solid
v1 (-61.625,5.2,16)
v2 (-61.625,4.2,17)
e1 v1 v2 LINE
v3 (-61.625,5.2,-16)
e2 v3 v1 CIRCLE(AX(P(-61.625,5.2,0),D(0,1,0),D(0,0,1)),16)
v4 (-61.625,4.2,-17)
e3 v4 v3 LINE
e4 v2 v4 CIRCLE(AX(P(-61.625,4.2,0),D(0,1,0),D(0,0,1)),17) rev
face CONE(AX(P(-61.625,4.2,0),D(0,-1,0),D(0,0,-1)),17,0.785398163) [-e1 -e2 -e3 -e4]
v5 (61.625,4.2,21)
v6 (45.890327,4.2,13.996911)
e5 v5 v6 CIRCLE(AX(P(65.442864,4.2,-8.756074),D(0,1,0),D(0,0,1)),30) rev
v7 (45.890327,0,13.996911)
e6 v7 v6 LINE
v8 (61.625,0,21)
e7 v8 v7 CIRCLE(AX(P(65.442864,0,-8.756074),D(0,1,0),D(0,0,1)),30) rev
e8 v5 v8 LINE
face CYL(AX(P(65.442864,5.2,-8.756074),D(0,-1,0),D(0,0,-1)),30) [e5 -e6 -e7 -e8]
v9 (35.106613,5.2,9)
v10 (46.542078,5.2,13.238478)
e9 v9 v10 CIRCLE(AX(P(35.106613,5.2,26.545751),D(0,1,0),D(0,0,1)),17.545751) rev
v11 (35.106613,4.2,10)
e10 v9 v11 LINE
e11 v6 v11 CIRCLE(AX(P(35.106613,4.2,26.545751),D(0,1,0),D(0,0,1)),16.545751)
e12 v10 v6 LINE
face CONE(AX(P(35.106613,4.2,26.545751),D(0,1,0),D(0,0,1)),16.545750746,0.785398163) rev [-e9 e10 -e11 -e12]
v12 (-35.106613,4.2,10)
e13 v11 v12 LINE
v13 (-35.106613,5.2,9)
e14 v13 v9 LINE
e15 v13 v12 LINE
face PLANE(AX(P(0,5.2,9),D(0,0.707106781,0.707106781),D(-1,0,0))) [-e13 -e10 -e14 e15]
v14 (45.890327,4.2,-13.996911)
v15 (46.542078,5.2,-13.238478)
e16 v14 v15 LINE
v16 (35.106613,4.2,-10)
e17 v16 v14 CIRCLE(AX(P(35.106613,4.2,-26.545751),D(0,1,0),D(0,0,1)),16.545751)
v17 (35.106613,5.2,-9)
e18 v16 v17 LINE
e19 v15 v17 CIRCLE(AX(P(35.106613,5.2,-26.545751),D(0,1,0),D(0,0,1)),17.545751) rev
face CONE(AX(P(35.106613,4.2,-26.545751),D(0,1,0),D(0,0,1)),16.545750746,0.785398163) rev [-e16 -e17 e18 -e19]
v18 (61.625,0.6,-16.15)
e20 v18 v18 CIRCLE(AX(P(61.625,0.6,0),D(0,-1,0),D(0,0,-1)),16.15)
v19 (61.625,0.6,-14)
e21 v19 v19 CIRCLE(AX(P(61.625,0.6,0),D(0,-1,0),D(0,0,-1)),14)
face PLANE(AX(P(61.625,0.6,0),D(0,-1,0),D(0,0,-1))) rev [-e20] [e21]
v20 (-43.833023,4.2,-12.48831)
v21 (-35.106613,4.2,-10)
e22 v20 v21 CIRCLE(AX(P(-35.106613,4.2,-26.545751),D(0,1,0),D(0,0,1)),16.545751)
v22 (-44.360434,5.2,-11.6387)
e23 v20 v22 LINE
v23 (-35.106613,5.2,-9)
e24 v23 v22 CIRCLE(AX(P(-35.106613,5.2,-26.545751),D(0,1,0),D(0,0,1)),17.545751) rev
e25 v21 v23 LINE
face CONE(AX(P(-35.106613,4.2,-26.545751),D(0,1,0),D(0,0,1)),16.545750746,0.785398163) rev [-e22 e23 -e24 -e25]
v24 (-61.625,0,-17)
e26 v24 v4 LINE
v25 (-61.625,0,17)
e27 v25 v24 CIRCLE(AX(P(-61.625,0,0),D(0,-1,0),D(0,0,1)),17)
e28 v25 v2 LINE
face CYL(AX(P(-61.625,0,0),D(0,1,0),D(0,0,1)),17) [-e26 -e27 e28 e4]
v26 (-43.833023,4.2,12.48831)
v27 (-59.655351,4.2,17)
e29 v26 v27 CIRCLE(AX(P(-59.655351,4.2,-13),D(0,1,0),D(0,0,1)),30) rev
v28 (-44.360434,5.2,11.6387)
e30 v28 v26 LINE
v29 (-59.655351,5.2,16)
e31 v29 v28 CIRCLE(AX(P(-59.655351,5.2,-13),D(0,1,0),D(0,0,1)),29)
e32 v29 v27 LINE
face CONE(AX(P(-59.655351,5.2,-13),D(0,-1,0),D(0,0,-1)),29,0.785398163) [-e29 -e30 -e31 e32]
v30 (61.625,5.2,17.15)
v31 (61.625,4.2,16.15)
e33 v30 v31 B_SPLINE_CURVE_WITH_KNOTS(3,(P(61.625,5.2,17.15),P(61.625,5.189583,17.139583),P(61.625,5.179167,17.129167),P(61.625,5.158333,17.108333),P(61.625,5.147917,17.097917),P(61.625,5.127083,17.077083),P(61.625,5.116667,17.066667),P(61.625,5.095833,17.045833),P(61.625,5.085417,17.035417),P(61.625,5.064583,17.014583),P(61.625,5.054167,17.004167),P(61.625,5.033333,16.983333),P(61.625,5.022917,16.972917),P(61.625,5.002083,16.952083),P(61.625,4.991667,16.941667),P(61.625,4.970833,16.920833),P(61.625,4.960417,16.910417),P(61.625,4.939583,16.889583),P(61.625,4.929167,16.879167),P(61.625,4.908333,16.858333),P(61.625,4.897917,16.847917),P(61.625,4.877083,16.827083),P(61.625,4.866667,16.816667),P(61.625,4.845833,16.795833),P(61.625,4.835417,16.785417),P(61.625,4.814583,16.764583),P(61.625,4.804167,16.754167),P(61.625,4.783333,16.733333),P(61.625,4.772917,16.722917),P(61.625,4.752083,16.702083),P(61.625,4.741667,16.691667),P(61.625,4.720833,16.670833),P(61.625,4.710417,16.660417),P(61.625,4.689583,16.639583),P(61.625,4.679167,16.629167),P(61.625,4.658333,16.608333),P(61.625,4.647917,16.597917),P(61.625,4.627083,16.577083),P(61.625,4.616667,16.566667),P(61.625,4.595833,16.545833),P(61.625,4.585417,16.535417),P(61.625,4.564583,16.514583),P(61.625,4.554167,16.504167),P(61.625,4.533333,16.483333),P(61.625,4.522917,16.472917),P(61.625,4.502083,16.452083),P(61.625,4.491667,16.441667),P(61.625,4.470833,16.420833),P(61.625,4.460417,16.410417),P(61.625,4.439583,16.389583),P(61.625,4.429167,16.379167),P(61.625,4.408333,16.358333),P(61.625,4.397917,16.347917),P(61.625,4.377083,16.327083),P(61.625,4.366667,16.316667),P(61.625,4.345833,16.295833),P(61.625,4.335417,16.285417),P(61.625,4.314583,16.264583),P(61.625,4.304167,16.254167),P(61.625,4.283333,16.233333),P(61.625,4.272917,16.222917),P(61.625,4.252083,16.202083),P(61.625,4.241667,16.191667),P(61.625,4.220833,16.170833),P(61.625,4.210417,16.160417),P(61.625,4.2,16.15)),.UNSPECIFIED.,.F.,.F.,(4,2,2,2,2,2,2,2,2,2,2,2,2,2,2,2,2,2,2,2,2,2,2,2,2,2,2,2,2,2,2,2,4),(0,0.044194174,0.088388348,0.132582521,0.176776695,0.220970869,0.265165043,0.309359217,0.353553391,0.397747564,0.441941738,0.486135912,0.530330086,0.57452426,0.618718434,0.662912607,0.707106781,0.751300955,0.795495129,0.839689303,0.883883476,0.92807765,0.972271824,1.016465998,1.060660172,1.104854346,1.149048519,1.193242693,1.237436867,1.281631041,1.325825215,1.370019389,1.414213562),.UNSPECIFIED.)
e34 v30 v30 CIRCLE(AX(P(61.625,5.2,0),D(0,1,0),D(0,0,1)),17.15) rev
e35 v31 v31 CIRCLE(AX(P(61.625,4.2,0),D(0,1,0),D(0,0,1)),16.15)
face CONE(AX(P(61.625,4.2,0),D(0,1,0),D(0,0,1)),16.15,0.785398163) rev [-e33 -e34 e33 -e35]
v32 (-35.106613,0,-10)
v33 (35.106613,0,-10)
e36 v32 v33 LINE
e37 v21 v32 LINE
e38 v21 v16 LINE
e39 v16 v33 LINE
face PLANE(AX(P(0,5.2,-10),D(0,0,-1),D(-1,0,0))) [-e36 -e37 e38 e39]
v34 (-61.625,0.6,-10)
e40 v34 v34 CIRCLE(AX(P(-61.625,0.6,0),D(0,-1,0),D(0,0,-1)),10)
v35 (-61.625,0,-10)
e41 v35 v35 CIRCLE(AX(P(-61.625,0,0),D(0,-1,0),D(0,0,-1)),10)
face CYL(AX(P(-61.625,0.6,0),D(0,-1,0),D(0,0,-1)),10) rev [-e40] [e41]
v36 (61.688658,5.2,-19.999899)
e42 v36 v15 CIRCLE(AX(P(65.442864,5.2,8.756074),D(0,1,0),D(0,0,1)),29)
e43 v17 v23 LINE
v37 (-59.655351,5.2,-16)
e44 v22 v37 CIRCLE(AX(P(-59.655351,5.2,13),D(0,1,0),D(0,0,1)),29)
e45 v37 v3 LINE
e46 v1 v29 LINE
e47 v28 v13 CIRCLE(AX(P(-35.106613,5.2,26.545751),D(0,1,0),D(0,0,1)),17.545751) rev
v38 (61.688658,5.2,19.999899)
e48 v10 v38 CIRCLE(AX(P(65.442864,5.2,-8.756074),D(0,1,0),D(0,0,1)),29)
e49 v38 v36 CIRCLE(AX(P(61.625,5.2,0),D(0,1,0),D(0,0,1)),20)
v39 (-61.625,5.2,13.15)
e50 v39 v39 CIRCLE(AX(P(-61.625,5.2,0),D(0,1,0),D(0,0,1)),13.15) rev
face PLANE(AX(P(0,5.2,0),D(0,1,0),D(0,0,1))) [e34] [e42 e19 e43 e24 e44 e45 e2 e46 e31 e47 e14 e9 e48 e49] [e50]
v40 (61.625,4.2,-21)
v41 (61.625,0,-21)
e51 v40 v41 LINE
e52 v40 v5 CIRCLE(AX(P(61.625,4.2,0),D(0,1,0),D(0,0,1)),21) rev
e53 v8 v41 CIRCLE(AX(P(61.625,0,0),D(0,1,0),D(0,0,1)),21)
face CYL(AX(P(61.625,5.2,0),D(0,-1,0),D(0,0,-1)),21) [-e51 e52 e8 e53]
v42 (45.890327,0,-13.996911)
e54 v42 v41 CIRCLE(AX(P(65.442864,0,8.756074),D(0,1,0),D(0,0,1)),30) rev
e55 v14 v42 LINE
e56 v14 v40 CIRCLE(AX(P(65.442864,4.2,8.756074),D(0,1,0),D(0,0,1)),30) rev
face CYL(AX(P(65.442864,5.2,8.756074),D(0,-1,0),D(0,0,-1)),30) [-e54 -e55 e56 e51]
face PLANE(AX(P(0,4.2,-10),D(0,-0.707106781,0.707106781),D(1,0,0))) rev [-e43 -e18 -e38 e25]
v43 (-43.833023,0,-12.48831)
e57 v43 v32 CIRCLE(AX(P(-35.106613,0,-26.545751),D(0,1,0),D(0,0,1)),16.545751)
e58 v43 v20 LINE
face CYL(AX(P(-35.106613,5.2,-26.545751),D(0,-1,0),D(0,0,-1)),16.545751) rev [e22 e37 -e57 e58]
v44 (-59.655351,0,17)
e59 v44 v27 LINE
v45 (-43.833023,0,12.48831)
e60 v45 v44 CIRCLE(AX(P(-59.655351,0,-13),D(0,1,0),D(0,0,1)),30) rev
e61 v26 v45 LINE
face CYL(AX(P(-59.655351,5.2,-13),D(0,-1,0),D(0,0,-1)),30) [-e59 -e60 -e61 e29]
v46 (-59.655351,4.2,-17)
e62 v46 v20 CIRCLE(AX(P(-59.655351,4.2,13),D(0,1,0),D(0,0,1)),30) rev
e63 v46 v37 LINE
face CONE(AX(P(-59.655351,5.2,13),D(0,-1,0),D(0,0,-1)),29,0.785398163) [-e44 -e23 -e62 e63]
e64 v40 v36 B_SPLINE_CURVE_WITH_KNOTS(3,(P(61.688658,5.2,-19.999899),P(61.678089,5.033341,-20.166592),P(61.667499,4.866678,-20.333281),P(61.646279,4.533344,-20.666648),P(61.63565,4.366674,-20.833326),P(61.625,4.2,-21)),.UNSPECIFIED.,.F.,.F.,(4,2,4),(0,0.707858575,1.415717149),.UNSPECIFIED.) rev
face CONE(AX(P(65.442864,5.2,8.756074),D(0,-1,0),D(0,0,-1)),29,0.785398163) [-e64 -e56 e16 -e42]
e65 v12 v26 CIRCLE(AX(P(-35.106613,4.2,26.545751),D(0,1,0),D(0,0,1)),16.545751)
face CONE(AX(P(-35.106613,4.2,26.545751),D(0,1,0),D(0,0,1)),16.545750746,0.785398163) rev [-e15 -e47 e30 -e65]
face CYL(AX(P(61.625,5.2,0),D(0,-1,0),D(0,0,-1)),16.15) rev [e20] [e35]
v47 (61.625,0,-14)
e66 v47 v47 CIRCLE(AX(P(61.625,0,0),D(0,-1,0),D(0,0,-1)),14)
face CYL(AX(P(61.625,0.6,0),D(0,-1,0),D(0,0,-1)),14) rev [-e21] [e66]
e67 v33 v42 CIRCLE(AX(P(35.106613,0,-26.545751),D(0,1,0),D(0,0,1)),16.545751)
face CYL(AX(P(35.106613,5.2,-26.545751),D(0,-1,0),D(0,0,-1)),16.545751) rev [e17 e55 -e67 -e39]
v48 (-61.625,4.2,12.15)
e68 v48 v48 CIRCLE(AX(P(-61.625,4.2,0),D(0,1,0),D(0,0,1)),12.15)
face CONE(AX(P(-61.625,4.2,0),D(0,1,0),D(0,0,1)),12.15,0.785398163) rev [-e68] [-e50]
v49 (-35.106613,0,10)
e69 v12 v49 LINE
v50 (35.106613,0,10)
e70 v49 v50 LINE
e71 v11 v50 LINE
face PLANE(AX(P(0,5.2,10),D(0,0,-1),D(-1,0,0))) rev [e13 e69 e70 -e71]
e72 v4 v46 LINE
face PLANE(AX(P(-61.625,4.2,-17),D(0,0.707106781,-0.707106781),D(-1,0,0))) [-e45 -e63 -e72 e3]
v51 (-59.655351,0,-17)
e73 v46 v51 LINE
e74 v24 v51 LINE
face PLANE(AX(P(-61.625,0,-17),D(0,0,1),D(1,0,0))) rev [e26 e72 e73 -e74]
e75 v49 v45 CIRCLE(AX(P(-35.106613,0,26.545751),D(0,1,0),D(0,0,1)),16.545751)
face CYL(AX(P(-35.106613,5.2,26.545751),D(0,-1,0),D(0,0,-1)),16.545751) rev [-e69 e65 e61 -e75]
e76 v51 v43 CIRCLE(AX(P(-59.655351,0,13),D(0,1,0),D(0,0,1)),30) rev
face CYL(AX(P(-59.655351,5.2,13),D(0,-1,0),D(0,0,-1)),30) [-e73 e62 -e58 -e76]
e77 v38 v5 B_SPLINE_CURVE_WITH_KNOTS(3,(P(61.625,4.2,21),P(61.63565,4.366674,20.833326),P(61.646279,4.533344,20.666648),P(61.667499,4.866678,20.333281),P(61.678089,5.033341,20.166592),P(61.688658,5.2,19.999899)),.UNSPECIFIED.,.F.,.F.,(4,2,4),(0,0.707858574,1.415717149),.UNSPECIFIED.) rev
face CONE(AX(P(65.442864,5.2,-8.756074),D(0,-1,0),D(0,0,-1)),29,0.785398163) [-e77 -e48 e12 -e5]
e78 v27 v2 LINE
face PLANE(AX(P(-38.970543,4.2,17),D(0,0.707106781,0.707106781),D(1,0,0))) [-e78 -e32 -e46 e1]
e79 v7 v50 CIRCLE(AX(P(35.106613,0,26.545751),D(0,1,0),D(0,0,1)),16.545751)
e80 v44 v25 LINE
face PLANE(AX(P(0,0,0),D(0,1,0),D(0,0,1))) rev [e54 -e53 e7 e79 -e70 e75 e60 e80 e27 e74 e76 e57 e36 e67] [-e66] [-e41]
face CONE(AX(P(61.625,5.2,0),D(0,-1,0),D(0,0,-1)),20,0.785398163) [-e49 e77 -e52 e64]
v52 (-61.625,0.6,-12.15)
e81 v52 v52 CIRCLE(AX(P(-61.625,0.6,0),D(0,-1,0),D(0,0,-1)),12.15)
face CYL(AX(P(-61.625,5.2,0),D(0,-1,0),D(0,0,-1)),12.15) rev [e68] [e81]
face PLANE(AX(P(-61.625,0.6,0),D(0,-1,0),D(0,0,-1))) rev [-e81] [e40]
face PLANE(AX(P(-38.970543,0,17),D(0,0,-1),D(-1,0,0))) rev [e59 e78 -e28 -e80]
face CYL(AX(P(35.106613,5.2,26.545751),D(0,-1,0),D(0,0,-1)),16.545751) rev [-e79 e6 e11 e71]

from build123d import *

# Parameters (mm, degrees)
SKETCH1_R           = 12.15
SKETCH1_R_2         = 16.15
BOSS_EXTRUDE1_DEPTH = 5.2
CUT_EXTRUDE1_DEPTH  = 86.410366028
FILLET1_R           = 30
CHAMFER1_SIZE       = 1
SKETCH2_R           = 14.75534968
SKETCH2_R_2         = 10
SKETCH2_R_3         = 19.025242353
SKETCH2_R_4         = 14
BOSS_EXTRUDE2_DEPTH = 0.6


with BuildPart() as part:
    # Sketch1 → Boss-Extrude1 (new body)
    with BuildSketch(Plane(origin=(0, 0, 0), x_dir=(1, 0, 0), z_dir=(0, 1, 0))):
        with BuildLine():
            Line((50.6952797, -21), (61.625, -21))
            ThreePointArc((61.625, -21), (82.625, 0), (61.625, 21))
            Line((61.625, 21), (50.6952797, 21))
            ThreePointArc((50.6952797, 21), (44.646090821, 13.026866227), (35.106613419, 10))
            Line((35.106613419, 10), (-35.106613419, 10))
            ThreePointArc((-35.106613419, 10), (-44.646090821, 13.026866227), (-50.6952797, 21))
            Line((-50.6952797, 21), (-61.625, 21))
            ThreePointArc((-61.625, 21), (-82.625, 0), (-61.625, -21))
            Line((-61.625, -21), (-50.6952797, -21))
            ThreePointArc((-50.6952797, -21), (-44.646090821, -13.026866227), (-35.106613419, -10))
            Line((-35.106613419, -10), (35.106613419, -10))
            ThreePointArc((35.106613419, -10), (44.646090821, -13.026866227), (50.6952797, -21))
        make_face()
        with Locations(Location((-61.625, 0, 0), (0, 0, 270))):
            Circle(SKETCH1_R, mode=Mode.SUBTRACT)
        with Locations(Location((61.625, 0, 0), (0, 0, 270))):
            Circle(SKETCH1_R_2, mode=Mode.SUBTRACT)
    extrude(amount=BOSS_EXTRUDE1_DEPTH)

    # Sketch4 → Cut-Extrude1 (cut, through all)
    with BuildSketch(Plane(origin=(0, 5.2, 0), x_dir=(1, 0, 0), z_dir=(0, 1, 0))):
        with BuildLine():
            Line((-61.625, 17), (-38.970543198, 17))
            Line((-38.970543198, 17), (-43.407950199, 33.342917206))
            Line((-43.407950199, 33.342917206), (-92.984497382, 23.090976894))
            Line((-92.984497382, 23.090976894), (-92.984497382, -9.501012459))
            Line((-92.984497382, -9.501012459), (-86.710921967, -27.097626428))
            Line((-86.710921967, -27.097626428), (-50.736883487, -31.973137348))
            Line((-50.736883487, -31.973137348), (-37.899444956, -29.584754809))
            Line((-37.899444956, -29.584754809), (-38.970543198, -17))
            Line((-38.970543198, -17), (-61.625, -17))
            ThreePointArc((-61.625, -17), (-78.625, 0), (-61.625, 17))
        make_face()
    extrude(amount=-CUT_EXTRUDE1_DEPTH, mode=Mode.SUBTRACT)

    # Fillet1
    # the kernel refuses this fillet: 30 mm, written as the material it takes off along each edge
    with BuildSketch(Plane(origin=(50.6952797, -27.324300751, -21), x_dir=(-0.5657553203908781, 0, 0.824573172889717), z_dir=(0, 1, 0))) as fillet1_piece_1:
        with BuildLine():
            CenterArc((16.192535549, 28.995119506), FILLET1_R, 221.766169003, 33.362358022)
            Line((-6.18354741, 9.012354147), (-6.631069069, 8.61269884))
            ThreePointArc((-6.631069069, 8.61269884), (-3.586517609, 4.166723881), (-0.494743904, -0.339453192))
            Line((-0.494743904, -0.339453192), (0.153990967, -0.57990239))
            ThreePointArc((0.153990967, -0.57990239), (4.246493598, -0.04578326), (8.338996228, -0.57990239))
            Line((8.338996228, -0.57990239), (8.492987195, 0))
        make_face()
    extrude(amount=59.848601502, mode=Mode.SUBTRACT)
    with BuildSketch(Plane(origin=(50.6952797, -27.324300751, 21), x_dir=(1, 0, 0), z_dir=(0, 1, 0))) as fillet1_piece_2:
        with BuildLine():
            CenterArc((14.747584551, 29.756073541), FILLET1_R, 229.326231532, 33.362358022)
            Line((-4.804952692, 7.003089399), (-5.196003436, 6.548029716))
            ThreePointArc((-5.196003436, 6.548029716), (-2.440227994, 3.475642576), (-0.565293163, -0.201106042))
            Line((-0.565293163, -0.201106042), (0, -0.6))
            ThreePointArc((0, -0.6), (5.46486015, -0.6), (10.853363015, -0.595121471))
            Line((10.853363015, -0.595121471), (10.9297203, 0))
        make_face()
    extrude(amount=59.848601502, mode=Mode.SUBTRACT)
    with BuildSketch(Plane(origin=(-48.621069029, 32.785704602, -17), x_dir=(-1, 0, 0), z_dir=(0, -1, 0))) as fillet1_piece_3:
        with BuildLine():
            CenterArc((11.034281841, -30), FILLET1_R, 90, 31.830687787)
            Line((-4.788045906, -4.511690039), (-5.104492461, -4.00192384))
            ThreePointArc((-5.104492461, -4.00192384), (-2.578998673, -2.059538928), (-0.490075881, 0.34615839))
            Line((-0.490075881, 0.34615839), (0, 0.6))
            Line((0, 0.6), (11.034281841, 0.6))
            Line((11.034281841, 0.6), (11.034281841, 0))
        make_face()
    extrude(amount=60.371409204, mode=Mode.SUBTRACT)
    with BuildSketch(Plane(origin=(-48.621069029, 32.785704602, 17), x_dir=(0.7277982616759969, 0, -0.6857912877117915), z_dir=(0, -1, 0))) as fillet1_piece_4:
        with BuildLine():
            CenterArc((12.543007489, -29.401162203), FILLET1_R, 101.467181472, 31.830687787)
            Line((-8.030731143, -7.567214353), (-8.442205915, -7.130535396))
            Line((-8.442205915, -7.130535396), (-0.411474773, 0.436678957))
            Line((-0.411474773, 0.436678957), (0.119283966, 0.588023244))
            ThreePointArc((0.119283966, 0.588023244), (3.289404605, 0.269725969), (6.459525243, 0.588023244))
            Line((6.459525243, 0.588023244), (6.578809209, 0))
        make_face()
    extrude(amount=60.371409204, mode=Mode.SUBTRACT)

    # Chamfer1
    # the kernel refuses this chamfer: 1 mm, written as the material it takes off along each edge
    with BuildSketch(Plane(origin=(61.625, 5.2, 0), x_dir=(-0.12235070165055927, 0, 0.9924869297908239), z_dir=(-0.9924869297908239, 0, -0.12235070165055927))) as chamfer1_piece_1:
        Polygon((21 - CHAMFER1_SIZE, 0), (21, -CHAMFER1_SIZE), (21, 0), align=None)
    revolve(axis=Axis((61.625, 5.2, 0), (0, 1, 0)), revolution_arc=194.055575488, mode=Mode.SUBTRACT)
    with BuildSketch(Plane(origin=(35.106613419, 5.2, -26.545750746), x_dir=(0.6517512414299695, 0, 0.7584328047325575), z_dir=(0.7584328047325575, 0, -0.6517512414299695))) as chamfer1_piece_2:
        Polygon((16.545750746 + CHAMFER1_SIZE, 0), (16.545750746, CHAMFER1_SIZE), (16.545750746, 0), align=None)
    revolve(axis=Axis((35.106613419, 5.2, -26.545750746), (0, -1, 0)), revolution_arc=40.673768468, mode=Mode.SUBTRACT)
    with BuildSketch(Plane(origin=(35.106613419, 5.2, -10), x_dir=(0, 0, 1), z_dir=(-1, 0, 0))) as chamfer1_piece_3:
        Polygon((CHAMFER1_SIZE, 0), (0, -CHAMFER1_SIZE), (0, 0), align=None)
    extrude(amount=70.213226838, mode=Mode.SUBTRACT)
    with BuildSketch(Plane(origin=(-61.625, 5.2, 0), x_dir=(0, 0, 1), z_dir=(1, 0, 0))) as chamfer1_piece_4:
        Polygon((17 - CHAMFER1_SIZE, 0), (17, CHAMFER1_SIZE), (17, 0), align=None)
    revolve(axis=Axis((-61.625, 5.2, 0), (0, -1, 0)), revolution_arc=180, mode=Mode.SUBTRACT)
    with BuildSketch(Plane(origin=(-61.625, 5.2, -17), x_dir=(0, 0, 1), z_dir=(1, 0, 0)), Plane(origin=(-59.65535087, 5.2, 17), x_dir=(0, 0, -1), z_dir=(-1, 0, 0))) as chamfer1_piece_5:
        Polygon((CHAMFER1_SIZE, 0), (0, CHAMFER1_SIZE), (0, 0), align=None)
    extrude(amount=1.96964913, mode=Mode.SUBTRACT)
    with BuildSketch(Plane(origin=(-35.106613419, 5.2, 26.545750746), x_dir=(-0.5274109249013418, 0, -0.8496103320315208), z_dir=(-0.8496103320315208, 0, 0.5274109249013418))) as chamfer1_piece_6:
        Polygon((16.545750746, CHAMFER1_SIZE), (16.545750746 + CHAMFER1_SIZE, 0), (16.545750746, 0), align=None)
    revolve(axis=Axis((-35.106613419, 5.2, 26.545750746), (0, -1, 0)), revolution_arc=31.830687787, mode=Mode.SUBTRACT)
    with BuildSketch(Plane(origin=(-35.106613419, 5.2, 10), x_dir=(0, -1, 0), z_dir=(1, 0, 0))) as chamfer1_piece_7:
        Polygon((CHAMFER1_SIZE, 0), (0, CHAMFER1_SIZE), (0, 0), align=None)
    extrude(amount=70.213226838, mode=Mode.SUBTRACT)
    with BuildSketch(Plane(origin=(-61.625, 5.2, 0), x_dir=(0, 0, 1), z_dir=(-1, 0, 0))) as chamfer1_piece_8:
        Polygon((12.15 + CHAMFER1_SIZE, 0), (12.15, -CHAMFER1_SIZE), (12.15, 0), align=None)
    revolve(axis=Axis((-61.625, 5.2, 0), (0, 1, 0)), mode=Mode.SUBTRACT)
    with BuildSketch(Plane(origin=(61.625, 5.2, 0), x_dir=(0, 0, 1), z_dir=(-1, 0, 0))) as chamfer1_piece_9:
        Polygon((16.15 + CHAMFER1_SIZE, 0), (16.15, -CHAMFER1_SIZE), (16.15, 0), align=None)
    revolve(axis=Axis((61.625, 5.2, 0), (0, 1, 0)), mode=Mode.SUBTRACT)
    with BuildSketch(Plane(origin=(-35.106613419, 5.2, -26.545750746), x_dir=(0, 0, 1), z_dir=(1, 0, 0))) as chamfer1_piece_10:
        Polygon((16.545750746 + CHAMFER1_SIZE, 0), (16.545750746, CHAMFER1_SIZE), (16.545750746, 0), align=None)
    revolve(axis=Axis((-35.106613419, 5.2, -26.545750746), (0, -1, 0)), revolution_arc=31.830687787, mode=Mode.SUBTRACT)
    with BuildSketch(Plane(origin=(35.106613419, 5.2, 26.545750746), x_dir=(0, 0, -1), z_dir=(-1, 0, 0))) as chamfer1_piece_11:
        Polygon((16.545750746 + CHAMFER1_SIZE, 0), (16.545750746, CHAMFER1_SIZE), (16.545750746, 0), align=None)
    revolve(axis=Axis((35.106613419, 5.2, 26.545750746), (0, -1, 0)), revolution_arc=40.673768468, mode=Mode.SUBTRACT)
    with BuildSketch(Plane(origin=(65.442864251, 5.2, -8.756073541), x_dir=(0.1292120287500912, 0, 0.9916169883711581), z_dir=(0.9916169883711581, 0, -0.1292120287500912))) as chamfer1_piece_12:
        Polygon((30 - CHAMFER1_SIZE, 0), (30, CHAMFER1_SIZE), (30, 0), align=None)
    revolve(axis=Axis((65.442864251, 5.2, -8.756073541), (0, -1, 0)), revolution_arc=48.097829324, mode=Mode.SUBTRACT)
    with BuildSketch(Plane(origin=(65.442864251, 5.2, 8.756073541), x_dir=(-0.6517512414300072, 0, -0.7584328047325251), z_dir=(-0.7584328047325251, 0, 0.6517512414300072))) as chamfer1_piece_13:
        Polygon((30 - CHAMFER1_SIZE, 0), (30, CHAMFER1_SIZE), (30, 0), align=None)
    revolve(axis=Axis((65.442864251, 5.2, 8.756073541), (0, -1, 0)), revolution_arc=48.097829324, mode=Mode.SUBTRACT)
    with BuildSketch(Plane(origin=(-59.65535087, 5.2, -13), x_dir=(0, 0, 1), z_dir=(-1, 0, 0))) as chamfer1_piece_14:
        Polygon((30 - CHAMFER1_SIZE, 0), (30, -CHAMFER1_SIZE), (30, 0), align=None)
    revolve(axis=Axis((-59.65535087, 5.2, -13), (0, 1, 0)), revolution_arc=31.830687787, mode=Mode.SUBTRACT)
    with BuildSketch(Plane(origin=(-59.65535087, 5.2, 13), x_dir=(0.5274109249013516, 0, -0.8496103320315149), z_dir=(0.8496103320315149, 0, 0.5274109249013516))) as chamfer1_piece_15:
        Polygon((30 - CHAMFER1_SIZE, 0), (30, -CHAMFER1_SIZE), (30, 0), align=None)
    revolve(axis=Axis((-59.65535087, 5.2, 13), (0, 1, 0)), revolution_arc=31.830687787, mode=Mode.SUBTRACT)

    # Sketch2 → Boss-Extrude2 (add)
    # profile 1 of 2: a face of its own
    with BuildSketch(Plane.XZ):
        with Locations((-61.625, 0)):
            Circle(SKETCH2_R)
        with Locations(Location((-61.625, 0, 0), (0, 0, 270))):
            Circle(SKETCH2_R_2, mode=Mode.SUBTRACT)
    # profile 2 of 2: a face of its own
    with BuildSketch(Plane.XZ):
        with Locations((61.625, 0)):
            Circle(SKETCH2_R_3)
        with Locations(Location((61.625, 0, 0), (0, 0, 270))):
            Circle(SKETCH2_R_4, mode=Mode.SUBTRACT)
    extrude(amount=-BOSS_EXTRUDE2_DEPTH)


solid = part.part
